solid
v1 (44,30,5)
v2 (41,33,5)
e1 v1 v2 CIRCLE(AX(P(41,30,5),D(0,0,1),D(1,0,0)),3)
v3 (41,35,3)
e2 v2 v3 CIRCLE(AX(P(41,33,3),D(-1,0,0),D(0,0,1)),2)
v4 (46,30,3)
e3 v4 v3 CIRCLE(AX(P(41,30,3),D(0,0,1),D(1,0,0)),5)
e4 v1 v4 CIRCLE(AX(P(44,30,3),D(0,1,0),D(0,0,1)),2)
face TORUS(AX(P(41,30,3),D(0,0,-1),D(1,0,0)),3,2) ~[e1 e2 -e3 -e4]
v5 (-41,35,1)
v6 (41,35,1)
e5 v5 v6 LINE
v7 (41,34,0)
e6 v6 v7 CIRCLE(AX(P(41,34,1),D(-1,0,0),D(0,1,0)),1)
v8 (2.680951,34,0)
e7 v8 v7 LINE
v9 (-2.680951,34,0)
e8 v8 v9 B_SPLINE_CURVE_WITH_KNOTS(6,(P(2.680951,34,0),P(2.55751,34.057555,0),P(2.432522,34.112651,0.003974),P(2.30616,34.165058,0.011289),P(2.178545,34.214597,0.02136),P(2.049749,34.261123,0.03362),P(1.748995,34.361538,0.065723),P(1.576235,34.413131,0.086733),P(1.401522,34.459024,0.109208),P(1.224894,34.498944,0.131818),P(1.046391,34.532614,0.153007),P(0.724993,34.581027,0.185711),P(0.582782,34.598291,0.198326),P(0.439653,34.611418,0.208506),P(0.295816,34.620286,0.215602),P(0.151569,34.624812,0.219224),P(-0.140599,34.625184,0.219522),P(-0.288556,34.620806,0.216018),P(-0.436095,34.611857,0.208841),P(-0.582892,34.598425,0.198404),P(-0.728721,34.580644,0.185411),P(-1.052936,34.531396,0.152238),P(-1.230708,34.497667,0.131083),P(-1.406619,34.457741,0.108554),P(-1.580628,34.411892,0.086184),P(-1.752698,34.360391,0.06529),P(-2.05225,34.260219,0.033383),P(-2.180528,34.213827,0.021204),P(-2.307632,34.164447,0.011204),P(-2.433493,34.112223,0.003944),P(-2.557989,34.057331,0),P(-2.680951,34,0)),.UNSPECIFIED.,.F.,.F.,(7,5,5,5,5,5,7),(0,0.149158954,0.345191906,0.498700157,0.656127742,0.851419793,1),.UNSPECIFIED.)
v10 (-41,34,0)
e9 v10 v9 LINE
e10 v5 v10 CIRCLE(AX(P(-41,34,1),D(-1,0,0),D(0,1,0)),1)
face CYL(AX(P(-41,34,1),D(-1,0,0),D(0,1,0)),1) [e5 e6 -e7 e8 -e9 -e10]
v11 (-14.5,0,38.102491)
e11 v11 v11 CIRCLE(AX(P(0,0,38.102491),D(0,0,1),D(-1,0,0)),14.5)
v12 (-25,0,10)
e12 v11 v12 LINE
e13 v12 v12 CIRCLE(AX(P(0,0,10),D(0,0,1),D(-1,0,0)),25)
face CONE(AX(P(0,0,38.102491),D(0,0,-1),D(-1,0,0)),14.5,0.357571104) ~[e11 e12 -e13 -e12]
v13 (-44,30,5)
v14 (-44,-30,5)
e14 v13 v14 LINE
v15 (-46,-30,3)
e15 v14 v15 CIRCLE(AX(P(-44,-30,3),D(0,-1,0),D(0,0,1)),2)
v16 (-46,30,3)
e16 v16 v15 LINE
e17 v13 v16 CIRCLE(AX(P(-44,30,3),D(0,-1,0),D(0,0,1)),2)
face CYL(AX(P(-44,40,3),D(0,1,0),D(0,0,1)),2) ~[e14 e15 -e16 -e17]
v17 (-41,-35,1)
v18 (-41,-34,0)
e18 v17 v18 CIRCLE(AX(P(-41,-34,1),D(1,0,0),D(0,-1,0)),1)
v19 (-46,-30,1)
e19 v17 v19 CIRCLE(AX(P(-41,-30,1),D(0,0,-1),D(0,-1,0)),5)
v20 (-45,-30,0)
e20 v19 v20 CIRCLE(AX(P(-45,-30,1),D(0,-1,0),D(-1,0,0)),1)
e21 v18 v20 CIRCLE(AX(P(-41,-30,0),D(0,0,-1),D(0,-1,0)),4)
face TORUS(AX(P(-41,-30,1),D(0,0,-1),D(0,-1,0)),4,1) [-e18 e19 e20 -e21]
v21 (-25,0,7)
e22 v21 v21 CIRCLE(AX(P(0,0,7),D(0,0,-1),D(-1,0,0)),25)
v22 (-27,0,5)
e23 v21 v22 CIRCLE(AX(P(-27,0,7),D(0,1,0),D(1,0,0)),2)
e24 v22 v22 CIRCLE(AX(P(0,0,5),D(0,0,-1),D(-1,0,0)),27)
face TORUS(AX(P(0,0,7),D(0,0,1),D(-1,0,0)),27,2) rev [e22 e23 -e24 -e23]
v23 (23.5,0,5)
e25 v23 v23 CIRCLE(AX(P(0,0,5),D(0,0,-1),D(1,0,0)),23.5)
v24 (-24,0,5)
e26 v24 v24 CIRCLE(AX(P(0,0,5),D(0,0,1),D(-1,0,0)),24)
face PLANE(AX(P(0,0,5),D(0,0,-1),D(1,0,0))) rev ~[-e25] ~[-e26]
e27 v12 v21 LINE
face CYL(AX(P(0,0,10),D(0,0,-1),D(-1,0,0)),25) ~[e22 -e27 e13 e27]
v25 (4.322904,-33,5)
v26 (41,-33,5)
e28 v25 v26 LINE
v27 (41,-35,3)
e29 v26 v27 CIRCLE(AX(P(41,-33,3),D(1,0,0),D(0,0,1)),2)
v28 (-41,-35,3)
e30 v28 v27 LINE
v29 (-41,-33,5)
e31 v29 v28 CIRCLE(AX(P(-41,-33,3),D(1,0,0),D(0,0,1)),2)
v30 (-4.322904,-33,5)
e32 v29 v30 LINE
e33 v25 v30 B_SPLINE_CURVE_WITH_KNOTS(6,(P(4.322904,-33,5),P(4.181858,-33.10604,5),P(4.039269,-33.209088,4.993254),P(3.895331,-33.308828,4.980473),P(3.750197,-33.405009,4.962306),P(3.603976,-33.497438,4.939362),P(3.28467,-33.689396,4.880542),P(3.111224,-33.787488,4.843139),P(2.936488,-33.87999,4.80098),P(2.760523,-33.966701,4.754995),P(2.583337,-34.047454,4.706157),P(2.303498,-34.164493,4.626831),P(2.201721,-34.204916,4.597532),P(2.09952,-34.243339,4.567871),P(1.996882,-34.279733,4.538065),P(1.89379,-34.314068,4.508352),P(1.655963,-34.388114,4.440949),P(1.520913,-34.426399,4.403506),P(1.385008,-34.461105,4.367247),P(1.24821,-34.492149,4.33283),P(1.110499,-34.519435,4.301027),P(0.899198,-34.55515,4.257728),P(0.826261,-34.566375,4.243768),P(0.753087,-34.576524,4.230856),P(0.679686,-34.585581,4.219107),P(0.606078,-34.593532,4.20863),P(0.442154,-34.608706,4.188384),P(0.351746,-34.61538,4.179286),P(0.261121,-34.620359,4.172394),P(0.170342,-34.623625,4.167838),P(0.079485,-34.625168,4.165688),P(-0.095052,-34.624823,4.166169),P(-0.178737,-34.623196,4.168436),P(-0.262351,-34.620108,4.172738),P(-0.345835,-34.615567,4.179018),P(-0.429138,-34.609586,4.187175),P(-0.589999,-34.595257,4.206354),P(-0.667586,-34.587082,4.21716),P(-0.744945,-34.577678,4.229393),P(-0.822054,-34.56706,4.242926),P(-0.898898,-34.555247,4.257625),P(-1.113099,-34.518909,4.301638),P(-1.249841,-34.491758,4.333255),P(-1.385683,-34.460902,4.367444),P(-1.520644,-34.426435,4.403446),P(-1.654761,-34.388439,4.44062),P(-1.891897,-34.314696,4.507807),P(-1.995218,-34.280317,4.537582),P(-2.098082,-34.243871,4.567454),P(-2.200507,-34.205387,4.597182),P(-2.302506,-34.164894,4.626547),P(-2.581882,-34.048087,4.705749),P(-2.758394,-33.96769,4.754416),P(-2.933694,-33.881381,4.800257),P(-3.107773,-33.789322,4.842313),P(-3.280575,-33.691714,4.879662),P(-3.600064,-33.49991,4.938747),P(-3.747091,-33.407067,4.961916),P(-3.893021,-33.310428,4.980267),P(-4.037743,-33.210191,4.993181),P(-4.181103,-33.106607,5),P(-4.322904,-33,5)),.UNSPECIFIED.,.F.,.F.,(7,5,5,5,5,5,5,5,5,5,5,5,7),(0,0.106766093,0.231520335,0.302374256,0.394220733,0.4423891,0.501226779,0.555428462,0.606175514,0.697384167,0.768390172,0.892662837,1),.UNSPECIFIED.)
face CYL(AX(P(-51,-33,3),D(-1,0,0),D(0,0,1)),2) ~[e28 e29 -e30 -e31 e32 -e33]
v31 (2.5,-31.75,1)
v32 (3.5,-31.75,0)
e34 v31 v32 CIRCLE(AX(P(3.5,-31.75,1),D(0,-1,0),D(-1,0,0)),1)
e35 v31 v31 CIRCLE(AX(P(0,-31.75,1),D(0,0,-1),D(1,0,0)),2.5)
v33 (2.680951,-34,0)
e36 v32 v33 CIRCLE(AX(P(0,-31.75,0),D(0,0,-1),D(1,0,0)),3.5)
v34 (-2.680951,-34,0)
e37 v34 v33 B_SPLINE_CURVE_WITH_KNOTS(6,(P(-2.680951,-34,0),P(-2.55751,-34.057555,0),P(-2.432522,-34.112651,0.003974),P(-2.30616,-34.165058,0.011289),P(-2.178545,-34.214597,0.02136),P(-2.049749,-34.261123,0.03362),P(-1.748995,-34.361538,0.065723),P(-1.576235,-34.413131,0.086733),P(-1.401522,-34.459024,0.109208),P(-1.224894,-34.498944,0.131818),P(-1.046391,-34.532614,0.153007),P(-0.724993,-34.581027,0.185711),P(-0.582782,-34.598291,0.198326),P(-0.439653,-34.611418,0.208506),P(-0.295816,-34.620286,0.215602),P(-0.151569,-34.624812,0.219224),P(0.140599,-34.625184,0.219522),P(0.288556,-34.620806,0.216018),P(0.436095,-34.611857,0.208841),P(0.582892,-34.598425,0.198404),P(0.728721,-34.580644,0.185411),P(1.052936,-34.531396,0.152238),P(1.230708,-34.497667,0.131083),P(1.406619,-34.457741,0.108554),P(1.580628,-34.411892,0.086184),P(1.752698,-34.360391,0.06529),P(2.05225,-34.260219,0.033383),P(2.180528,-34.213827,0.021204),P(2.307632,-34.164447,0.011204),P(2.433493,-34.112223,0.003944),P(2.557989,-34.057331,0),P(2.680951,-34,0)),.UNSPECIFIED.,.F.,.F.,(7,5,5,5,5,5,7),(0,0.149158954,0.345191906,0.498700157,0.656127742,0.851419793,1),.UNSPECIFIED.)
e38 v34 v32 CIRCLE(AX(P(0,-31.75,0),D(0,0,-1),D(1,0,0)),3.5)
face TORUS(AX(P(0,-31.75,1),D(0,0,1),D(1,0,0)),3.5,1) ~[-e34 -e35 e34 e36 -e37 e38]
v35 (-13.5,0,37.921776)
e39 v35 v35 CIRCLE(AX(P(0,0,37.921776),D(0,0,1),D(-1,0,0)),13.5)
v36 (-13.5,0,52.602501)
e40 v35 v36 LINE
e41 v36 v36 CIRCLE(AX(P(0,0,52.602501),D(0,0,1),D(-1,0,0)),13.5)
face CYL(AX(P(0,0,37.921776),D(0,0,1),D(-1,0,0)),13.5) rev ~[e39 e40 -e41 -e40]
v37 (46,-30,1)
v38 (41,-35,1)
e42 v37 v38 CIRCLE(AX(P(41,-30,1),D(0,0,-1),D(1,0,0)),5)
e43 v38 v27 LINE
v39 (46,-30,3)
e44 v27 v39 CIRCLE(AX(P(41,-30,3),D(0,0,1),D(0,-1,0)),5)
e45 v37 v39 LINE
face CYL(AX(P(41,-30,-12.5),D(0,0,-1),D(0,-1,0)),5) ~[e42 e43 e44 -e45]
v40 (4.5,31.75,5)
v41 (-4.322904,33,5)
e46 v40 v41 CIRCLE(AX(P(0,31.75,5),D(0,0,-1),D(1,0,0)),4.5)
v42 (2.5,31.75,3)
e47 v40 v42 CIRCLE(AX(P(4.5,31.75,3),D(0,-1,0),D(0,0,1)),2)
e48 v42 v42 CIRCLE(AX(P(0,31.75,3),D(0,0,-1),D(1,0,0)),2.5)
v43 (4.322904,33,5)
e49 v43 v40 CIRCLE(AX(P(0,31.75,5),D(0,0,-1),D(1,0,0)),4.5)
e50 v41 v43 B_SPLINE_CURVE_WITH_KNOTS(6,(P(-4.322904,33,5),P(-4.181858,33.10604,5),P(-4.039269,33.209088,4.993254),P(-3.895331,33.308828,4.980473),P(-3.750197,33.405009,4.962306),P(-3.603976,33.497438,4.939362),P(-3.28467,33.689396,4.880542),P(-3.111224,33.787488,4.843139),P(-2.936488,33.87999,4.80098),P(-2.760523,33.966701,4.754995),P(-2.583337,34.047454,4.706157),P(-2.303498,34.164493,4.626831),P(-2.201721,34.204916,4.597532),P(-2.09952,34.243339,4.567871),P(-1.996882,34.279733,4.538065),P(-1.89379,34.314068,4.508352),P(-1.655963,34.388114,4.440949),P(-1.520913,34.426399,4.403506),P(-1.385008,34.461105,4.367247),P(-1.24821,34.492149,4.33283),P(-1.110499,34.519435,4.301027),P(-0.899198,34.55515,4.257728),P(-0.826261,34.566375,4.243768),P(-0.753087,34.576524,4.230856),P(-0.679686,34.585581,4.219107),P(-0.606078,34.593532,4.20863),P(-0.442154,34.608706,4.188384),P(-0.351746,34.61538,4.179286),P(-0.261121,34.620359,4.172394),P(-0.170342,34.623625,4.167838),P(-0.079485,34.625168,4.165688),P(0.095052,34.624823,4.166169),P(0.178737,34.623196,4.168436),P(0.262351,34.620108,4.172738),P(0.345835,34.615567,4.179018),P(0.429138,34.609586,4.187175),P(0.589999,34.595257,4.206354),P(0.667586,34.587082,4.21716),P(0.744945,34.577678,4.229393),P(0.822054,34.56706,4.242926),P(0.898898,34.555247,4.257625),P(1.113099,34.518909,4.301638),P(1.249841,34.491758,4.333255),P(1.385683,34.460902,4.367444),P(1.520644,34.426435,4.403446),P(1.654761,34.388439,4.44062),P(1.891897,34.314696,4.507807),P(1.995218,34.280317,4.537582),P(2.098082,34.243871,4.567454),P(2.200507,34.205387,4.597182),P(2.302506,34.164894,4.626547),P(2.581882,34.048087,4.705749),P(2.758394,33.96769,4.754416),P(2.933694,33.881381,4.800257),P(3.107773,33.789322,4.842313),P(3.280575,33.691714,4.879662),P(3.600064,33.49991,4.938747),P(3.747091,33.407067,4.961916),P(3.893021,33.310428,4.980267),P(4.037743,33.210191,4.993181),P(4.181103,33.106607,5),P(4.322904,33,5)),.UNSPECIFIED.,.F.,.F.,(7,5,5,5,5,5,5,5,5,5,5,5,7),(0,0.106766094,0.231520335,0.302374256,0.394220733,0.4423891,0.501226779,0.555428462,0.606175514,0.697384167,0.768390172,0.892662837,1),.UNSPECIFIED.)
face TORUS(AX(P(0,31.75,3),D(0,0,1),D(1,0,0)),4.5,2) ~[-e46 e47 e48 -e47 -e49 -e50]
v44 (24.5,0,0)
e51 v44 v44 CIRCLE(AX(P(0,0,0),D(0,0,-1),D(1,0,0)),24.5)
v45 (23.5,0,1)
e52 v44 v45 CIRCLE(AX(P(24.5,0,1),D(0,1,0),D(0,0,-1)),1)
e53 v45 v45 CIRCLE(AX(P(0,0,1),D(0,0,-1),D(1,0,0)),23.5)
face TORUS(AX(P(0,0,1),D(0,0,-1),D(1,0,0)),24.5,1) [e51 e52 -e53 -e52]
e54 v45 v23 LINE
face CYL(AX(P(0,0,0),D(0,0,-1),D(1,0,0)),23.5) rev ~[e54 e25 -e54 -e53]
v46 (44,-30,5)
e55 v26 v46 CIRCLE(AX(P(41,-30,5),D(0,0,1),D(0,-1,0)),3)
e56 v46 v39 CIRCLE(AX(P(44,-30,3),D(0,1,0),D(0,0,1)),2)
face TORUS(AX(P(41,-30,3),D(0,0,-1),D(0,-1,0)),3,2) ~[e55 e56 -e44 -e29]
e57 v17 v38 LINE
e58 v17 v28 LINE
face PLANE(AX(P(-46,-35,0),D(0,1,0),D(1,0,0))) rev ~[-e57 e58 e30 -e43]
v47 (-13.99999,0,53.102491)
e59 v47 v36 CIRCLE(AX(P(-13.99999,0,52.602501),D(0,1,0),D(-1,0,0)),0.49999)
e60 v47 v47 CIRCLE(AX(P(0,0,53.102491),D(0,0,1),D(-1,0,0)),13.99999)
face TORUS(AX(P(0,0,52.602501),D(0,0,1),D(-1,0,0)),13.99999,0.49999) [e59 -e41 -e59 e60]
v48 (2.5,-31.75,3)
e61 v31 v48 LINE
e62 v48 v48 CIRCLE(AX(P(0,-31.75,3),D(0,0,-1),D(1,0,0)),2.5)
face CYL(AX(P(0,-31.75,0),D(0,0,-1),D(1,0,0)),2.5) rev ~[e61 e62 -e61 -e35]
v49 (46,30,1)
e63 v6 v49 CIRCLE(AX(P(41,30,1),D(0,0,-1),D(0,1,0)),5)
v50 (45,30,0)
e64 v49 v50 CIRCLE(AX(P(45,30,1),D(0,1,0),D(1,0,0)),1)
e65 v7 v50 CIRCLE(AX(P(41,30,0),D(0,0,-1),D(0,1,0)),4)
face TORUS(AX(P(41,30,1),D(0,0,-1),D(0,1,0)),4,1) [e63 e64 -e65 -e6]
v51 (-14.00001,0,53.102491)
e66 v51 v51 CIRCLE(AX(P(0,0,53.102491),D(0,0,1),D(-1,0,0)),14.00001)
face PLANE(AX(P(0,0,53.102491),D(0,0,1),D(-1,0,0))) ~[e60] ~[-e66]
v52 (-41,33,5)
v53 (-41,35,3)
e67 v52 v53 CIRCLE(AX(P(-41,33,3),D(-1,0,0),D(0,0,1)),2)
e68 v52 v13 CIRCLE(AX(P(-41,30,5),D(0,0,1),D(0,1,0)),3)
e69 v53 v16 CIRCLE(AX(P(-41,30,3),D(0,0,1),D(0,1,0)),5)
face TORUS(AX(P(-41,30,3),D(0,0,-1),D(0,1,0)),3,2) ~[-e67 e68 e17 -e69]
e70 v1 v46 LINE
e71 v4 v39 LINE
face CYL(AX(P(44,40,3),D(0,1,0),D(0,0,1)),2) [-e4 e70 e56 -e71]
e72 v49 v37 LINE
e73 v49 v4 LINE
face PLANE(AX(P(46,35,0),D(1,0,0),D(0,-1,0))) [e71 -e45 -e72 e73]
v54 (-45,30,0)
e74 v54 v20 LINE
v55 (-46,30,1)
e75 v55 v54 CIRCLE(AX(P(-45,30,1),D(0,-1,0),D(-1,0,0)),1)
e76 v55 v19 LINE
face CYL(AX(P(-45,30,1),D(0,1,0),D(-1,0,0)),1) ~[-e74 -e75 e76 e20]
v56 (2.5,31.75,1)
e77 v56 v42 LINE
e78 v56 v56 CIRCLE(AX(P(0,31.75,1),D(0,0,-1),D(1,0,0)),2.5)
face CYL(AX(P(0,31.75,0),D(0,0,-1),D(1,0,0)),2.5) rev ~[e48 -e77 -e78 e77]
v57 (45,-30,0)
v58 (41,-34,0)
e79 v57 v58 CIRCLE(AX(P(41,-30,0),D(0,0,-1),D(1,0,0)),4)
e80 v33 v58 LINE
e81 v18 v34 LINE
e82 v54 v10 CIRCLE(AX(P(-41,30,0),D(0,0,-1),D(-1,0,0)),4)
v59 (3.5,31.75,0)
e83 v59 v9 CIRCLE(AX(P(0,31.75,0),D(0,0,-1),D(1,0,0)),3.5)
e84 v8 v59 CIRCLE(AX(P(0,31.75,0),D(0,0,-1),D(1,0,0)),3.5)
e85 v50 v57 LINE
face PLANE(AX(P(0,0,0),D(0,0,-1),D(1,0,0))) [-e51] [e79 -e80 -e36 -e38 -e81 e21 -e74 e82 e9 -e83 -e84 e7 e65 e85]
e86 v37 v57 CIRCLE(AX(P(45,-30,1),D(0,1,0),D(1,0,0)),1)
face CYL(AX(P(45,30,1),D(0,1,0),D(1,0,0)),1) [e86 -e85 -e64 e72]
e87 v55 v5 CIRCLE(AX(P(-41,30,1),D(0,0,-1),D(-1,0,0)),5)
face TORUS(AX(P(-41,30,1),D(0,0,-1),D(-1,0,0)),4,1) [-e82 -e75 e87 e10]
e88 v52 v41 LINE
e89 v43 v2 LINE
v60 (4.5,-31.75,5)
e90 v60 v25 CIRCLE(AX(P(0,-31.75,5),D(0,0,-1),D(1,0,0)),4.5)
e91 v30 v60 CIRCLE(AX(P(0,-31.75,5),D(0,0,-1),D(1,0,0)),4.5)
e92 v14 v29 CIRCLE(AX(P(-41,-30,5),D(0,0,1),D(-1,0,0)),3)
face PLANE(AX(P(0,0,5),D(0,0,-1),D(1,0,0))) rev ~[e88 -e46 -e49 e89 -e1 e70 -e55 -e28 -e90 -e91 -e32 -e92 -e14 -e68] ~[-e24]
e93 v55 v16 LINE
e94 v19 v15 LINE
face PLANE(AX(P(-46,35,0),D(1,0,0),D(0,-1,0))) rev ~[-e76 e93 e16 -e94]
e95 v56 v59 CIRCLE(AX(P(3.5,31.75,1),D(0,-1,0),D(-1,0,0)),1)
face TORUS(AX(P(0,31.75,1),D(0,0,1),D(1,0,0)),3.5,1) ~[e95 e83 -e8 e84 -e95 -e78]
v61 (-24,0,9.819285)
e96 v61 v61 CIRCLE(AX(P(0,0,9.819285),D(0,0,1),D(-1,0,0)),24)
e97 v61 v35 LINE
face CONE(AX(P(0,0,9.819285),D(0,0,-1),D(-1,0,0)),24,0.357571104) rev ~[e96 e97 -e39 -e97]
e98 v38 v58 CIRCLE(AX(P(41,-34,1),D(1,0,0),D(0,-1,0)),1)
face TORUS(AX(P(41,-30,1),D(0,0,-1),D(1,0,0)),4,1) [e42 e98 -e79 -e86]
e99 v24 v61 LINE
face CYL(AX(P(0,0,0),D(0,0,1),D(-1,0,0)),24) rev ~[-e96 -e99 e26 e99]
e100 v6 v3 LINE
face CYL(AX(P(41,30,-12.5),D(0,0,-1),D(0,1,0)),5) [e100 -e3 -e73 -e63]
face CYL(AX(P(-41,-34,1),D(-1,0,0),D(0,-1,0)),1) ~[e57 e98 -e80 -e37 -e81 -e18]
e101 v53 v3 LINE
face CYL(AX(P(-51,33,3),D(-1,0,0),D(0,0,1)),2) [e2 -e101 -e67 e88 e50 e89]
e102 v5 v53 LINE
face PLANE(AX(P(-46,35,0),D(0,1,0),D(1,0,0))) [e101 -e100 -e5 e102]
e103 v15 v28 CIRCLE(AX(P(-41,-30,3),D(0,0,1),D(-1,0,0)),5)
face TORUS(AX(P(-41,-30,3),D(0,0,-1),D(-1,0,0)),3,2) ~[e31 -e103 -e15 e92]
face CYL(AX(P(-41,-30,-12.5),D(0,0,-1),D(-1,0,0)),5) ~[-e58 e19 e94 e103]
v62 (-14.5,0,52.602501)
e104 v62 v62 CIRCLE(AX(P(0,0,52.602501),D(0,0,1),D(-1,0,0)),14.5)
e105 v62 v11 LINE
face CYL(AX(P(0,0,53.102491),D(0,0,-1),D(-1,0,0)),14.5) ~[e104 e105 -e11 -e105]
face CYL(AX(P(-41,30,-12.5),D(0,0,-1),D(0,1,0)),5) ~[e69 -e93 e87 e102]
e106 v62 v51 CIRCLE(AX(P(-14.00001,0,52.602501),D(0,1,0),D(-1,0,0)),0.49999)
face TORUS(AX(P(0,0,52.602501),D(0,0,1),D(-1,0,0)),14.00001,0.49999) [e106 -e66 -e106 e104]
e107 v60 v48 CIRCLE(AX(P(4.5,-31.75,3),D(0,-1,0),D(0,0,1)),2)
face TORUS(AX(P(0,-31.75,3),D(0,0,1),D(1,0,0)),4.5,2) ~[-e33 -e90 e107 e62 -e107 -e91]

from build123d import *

# Parameters (mm, degrees)
F3_W          = 92
F3_H          = 70
F3_R          = 2.5
F4_DEPTH      = 5
F5_R          = 23.5
F6_DEPTH      = 5
F7_T3_DEPTH   = 102
F7_T5_DEPTH   = 80
F8_T1_DEPTH   = 17.4999999999
F8_T4_ANGLE   = 90
F8_T6_ANGLE   = 90
F8_T8_ANGLE   = 90
F8_T10_ANGLE  = 90
F9_R          = 0.49999
F10_T1_DEPTH  = 60
F10_T3_DEPTH  = 82
F10_T6_ANGLE  = 89.9999999974
F10_T8_ANGLE  = 89.9999999974
F10_T10_ANGLE = 89.9999999974
F10_T12_ANGLE = 89.9999999974


# Not quite as in the source:
# - a fillet or chamfer that OpenCascade refuses, or shapes differently, is made with other operations: its cross-section is extruded or revolved along the edge and cut away or added
# - a fillet or chamfer is up to 0.001 mm smaller than in the source, because OpenCascade refuses the exact size


with BuildPart() as f1:
    # F0 (on Front) → F1 (revolve)
    with BuildSketch(Plane.XZ):
        Polygon((-25, 10), (-25, 0), (-24, 0), (-24, 9.8192848565), (-13.5, 37.9217758492), (-13.5, 53.1024909928), (-14.5, 53.1024909928), (-14.5, 38.1024909928), align=None)
    revolve(axis=Axis((0, 0, 23.4480407089), (0, 0, 1)))

    # F3 (on offset) → F4 (join)
    with BuildSketch(Plane(origin=(0, 0, 0), x_dir=(1, 0, 0), z_dir=(0, 0, -1))):
        Rectangle(F3_W, F3_H)
        with Locations((0, -31.75)):
            Circle(F3_R, mode=Mode.SUBTRACT)
        with Locations((0, 31.75)):
            Circle(F3_R, mode=Mode.SUBTRACT)
    extrude(amount=-F4_DEPTH)

    # F5 (on face) → F6 (cut, through all)
    with BuildSketch(Plane(origin=(0, 0, 0), x_dir=(1, 0, 0), z_dir=(0, 0, -1))):
        Circle(F5_R)
    extrude(amount=-F6_DEPTH, mode=Mode.SUBTRACT)

    # F7: fillet of radius 2 on 7 edges, made by hand

    # F7_s1 → F7_t2 (revolve)
    with BuildSketch(Plane.XZ):
        with BuildLine():
            ThreePointArc((-25, 7), (-25.5857864376, 5.5857864376), (-27, 5))
            Line((-27, 5), (-25, 5))
            Line((-25, 5), (-25, 7))
        make_face()
    revolve(axis=Axis((0, 0, 5), (0, 0, -1)))

    # F7_s4 → F7_t3 (cut)
    with BuildSketch(Plane.YZ.offset(-51)):
        with BuildLine():
            ThreePointArc((-33, 5), (-34.4142135624, 4.4142135624), (-35, 3))
            Line((-35, 3), (-35, 5))
            Line((-35, 5), (-33, 5))
        make_face()
        with BuildLine():
            ThreePointArc((33, 5), (34.4142135624, 4.4142135624), (35, 3))
            Line((35, 3), (35, 5))
            Line((35, 5), (33, 5))
        make_face()
    extrude(amount=F7_T3_DEPTH, mode=Mode.SUBTRACT)

    # F7_s6 → F7_t5 (cut)
    with BuildSketch(Plane.XZ.offset(-40)):
        with BuildLine():
            ThreePointArc((44, 5), (45.4142135624, 4.4142135624), (46, 3))
            Line((46, 3), (46, 5))
            Line((46, 5), (44, 5))
        make_face()
        with BuildLine():
            ThreePointArc((-44, 5), (-45.4142135624, 4.4142135624), (-46, 3))
            Line((-46, 3), (-46, 5))
            Line((-46, 5), (-44, 5))
        make_face()
    extrude(amount=F7_T5_DEPTH, mode=Mode.SUBTRACT)

    # F7_s7 → F7_t8 (revolve, cut)
    with BuildSketch(Plane.XZ.offset(-31.75)):
        with BuildLine():
            ThreePointArc((4.5, 5), (3.0857864376, 4.4142135624), (2.5, 3))
            Line((2.5, 3), (2.5, 5))
            Line((2.5, 5), (4.5, 5))
        make_face()
    revolve(axis=Axis((0, 31.75, 5), (0, 0, -1)), mode=Mode.SUBTRACT)

    # F7_s9 → F7_t10 (revolve, cut)
    with BuildSketch(Plane.XZ.offset(31.75)):
        with BuildLine():
            ThreePointArc((4.5, 5), (3.0857864376, 4.4142135624), (2.5, 3))
            Line((2.5, 3), (2.5, 5))
            Line((2.5, 5), (4.5, 5))
        make_face()
    revolve(axis=Axis((0, -31.75, 5), (0, 0, -1)), mode=Mode.SUBTRACT)

    # F8: fillet of radius 5 on 4 edges, made by hand

    # F8_s2 → F8_t1 (cut)
    with BuildSketch(Plane.XY.offset(-12.5)):
        with BuildLine():
            ThreePointArc((41, -35), (44.5355339059, -33.5355339059), (46, -30))
            Line((46, -30), (46, -35))
            Line((46, -35), (41, -35))
        make_face()
        with BuildLine():
            ThreePointArc((-46, -30), (-44.5355339059, -33.5355339059), (-41, -35))
            Line((-41, -35), (-46, -35))
            Line((-46, -35), (-46, -30))
        make_face()
        with BuildLine():
            ThreePointArc((-41, 35), (-44.5355339059, 33.5355339059), (-46, 30))
            Line((-46, 30), (-46, 35))
            Line((-46, 35), (-41, 35))
        make_face()
        with BuildLine():
            ThreePointArc((41, 35), (44.5355339059, 33.5355339059), (46, 30))
            Line((46, 30), (46, 35))
            Line((46, 35), (41, 35))
        make_face()
    extrude(amount=F8_T1_DEPTH, mode=Mode.SUBTRACT)

    # F8_s3 → F8_t4 (revolve, cut)
    with BuildSketch(Plane.XZ.offset(-30)):
        with BuildLine():
            ThreePointArc((44.0000000001, 5), (45.4142135624, 4.4142135624), (46, 3.0000000001))
            Line((46, 3.0000000001), (46, 5))
            Line((46, 5), (44.0000000001, 5))
        make_face()
    revolve(axis=Axis((41, 30, 5), (0, 0, 1)), revolution_arc=F8_T4_ANGLE, mode=Mode.SUBTRACT)

    # F8_s5 → F8_t6 (revolve, cut)
    with BuildSketch(Plane.YZ.offset(-41)):
        with BuildLine():
            ThreePointArc((33.0000000001, 5), (34.4142135624, 4.4142135624), (35, 3.0000000001))
            Line((35, 3.0000000001), (35, 5))
            Line((35, 5), (33.0000000001, 5))
        make_face()
    revolve(axis=Axis((-41, 30, 5), (0, 0, 1)), revolution_arc=F8_T6_ANGLE, mode=Mode.SUBTRACT)

    # F8_s7 → F8_t8 (revolve, cut)
    with BuildSketch(Plane.XZ.offset(30)):
        with BuildLine():
            ThreePointArc((-44.0000000001, 5), (-45.4142135624, 4.4142135624), (-46, 3.0000000001))
            Line((-46, 3.0000000001), (-46, 5))
            Line((-46, 5), (-44.0000000001, 5))
        make_face()
    revolve(axis=Axis((-41, -30, 5), (0, 0, 1)), revolution_arc=F8_T8_ANGLE, mode=Mode.SUBTRACT)

    # F8_s9 → F8_t10 (revolve, cut)
    with BuildSketch(Plane.YZ.offset(41)):
        with BuildLine():
            ThreePointArc((-33.0000000001, 5), (-34.4142135624, 4.4142135624), (-35, 3.0000000001))
            Line((-35, 3.0000000001), (-35, 5))
            Line((-35, 5), (-33.0000000001, 5))
        make_face()
    revolve(axis=Axis((41, -30, 5), (0, 0, 1)), revolution_arc=F8_T10_ANGLE, mode=Mode.SUBTRACT)

    # F9 (radius 0.5 in the source; OpenCascade refuses exactly that, so slightly less here)
    f9_edges = [f1.edges().sort_by_distance(p)[0] for p in [
        (13.5, 0, 53.102491),
        (14.5, 0, 53.102491),
    ]]
    fillet(f9_edges, radius=F9_R)

    # F10: fillet of radius 1 on 11 edges, made by hand

    # F10_s2 → F10_t1 (cut)
    with BuildSketch(Plane.XZ.offset(-30)):
        with BuildLine():
            ThreePointArc((46, 1), (45.7071067812, 0.2928932188), (45, 0))
            Line((45, 0), (46, 0))
            Line((46, 0), (46, 1))
        make_face()
        with BuildLine():
            ThreePointArc((-46, 1), (-45.7071067812, 0.2928932188), (-45, 0))
            Line((-45, 0), (-46, 0))
            Line((-46, 0), (-46, 1))
        make_face()
    extrude(amount=F10_T1_DEPTH, mode=Mode.SUBTRACT)

    # F10_s4 → F10_t3 (cut)
    with BuildSketch(Plane.YZ.offset(-41)):
        with BuildLine():
            ThreePointArc((35, 1), (34.7071067812, 0.2928932188), (34, 0))
            Line((34, 0), (35, 0))
            Line((35, 0), (35, 1))
        make_face()
        with BuildLine():
            ThreePointArc((-35, 1), (-34.7071067812, 0.2928932188), (-34, 0))
            Line((-34, 0), (-35, 0))
            Line((-35, 0), (-35, 1))
        make_face()
    extrude(amount=F10_T3_DEPTH, mode=Mode.SUBTRACT)

    # F10_s5 → F10_t6 (revolve, cut)
    with BuildSketch(Plane.XZ.offset(29.9999999999)):
        with BuildLine():
            ThreePointArc((46, 1), (45.7071067812, 0.2928932188), (45, 0))
            Line((45, 0), (46, 0))
            Line((46, 0), (46, 1))
        make_face()
    revolve(axis=Axis((40.9999999999, -29.9999999999, 0), (0, 0, -1)), revolution_arc=F10_T6_ANGLE, mode=Mode.SUBTRACT)

    # F10_s7 → F10_t8 (revolve, cut)
    with BuildSketch(Plane.YZ.offset(40.9999999999)):
        with BuildLine():
            ThreePointArc((35, 1), (34.7071067812, 0.2928932188), (34, 0))
            Line((34, 0), (35, 0))
            Line((35, 0), (35, 1))
        make_face()
    revolve(axis=Axis((40.9999999999, 29.9999999999, 0), (0, 0, -1)), revolution_arc=F10_T8_ANGLE, mode=Mode.SUBTRACT)

    # F10_s9 → F10_t10 (revolve, cut)
    with BuildSketch(Plane.XZ.offset(-29.9999999999)):
        with BuildLine():
            ThreePointArc((-46, 1), (-45.7071067812, 0.2928932188), (-45, 0))
            Line((-45, 0), (-46, 0))
            Line((-46, 0), (-46, 1))
        make_face()
    revolve(axis=Axis((-40.9999999999, 29.9999999999, 0), (0, 0, -1)), revolution_arc=F10_T10_ANGLE, mode=Mode.SUBTRACT)

    # F10_s11 → F10_t12 (revolve, cut)
    with BuildSketch(Plane.YZ.offset(-40.9999999999)):
        with BuildLine():
            ThreePointArc((-35, 1), (-34.7071067812, 0.2928932188), (-34, 0))
            Line((-34, 0), (-35, 0))
            Line((-35, 0), (-35, 1))
        make_face()
    revolve(axis=Axis((-40.9999999999, -29.9999999999, 0), (0, 0, -1)), revolution_arc=F10_T12_ANGLE, mode=Mode.SUBTRACT)

    # F10_s13 → F10_t14 (revolve, cut)
    with BuildSketch(Plane.XZ.offset(-31.75)):
        with BuildLine():
            ThreePointArc((2.5, 1), (2.7928932188, 0.2928932188), (3.5, 0))
            Line((3.5, 0), (2.5, 0))
            Line((2.5, 0), (2.5, 1))
        make_face()
    revolve(axis=Axis((0, 31.75, 0), (0, 0, -1)), mode=Mode.SUBTRACT)

    # F10_s15 → F10_t16 (revolve, cut)
    with BuildSketch(Plane.XZ):
        with BuildLine():
            ThreePointArc((24.5, 0), (23.7928932188, 0.2928932188), (23.5, 1))
            Line((23.5, 1), (23.5, 0))
            Line((23.5, 0), (24.5, 0))
        make_face()
    revolve(axis=Axis((0, 0, 0), (0, 0, -1)), mode=Mode.SUBTRACT)

    # F10_s17 → F10_t18 (revolve, cut)
    with BuildSketch(Plane.XZ.offset(31.75)):
        with BuildLine():
            ThreePointArc((2.5, 1), (2.7928932188, 0.2928932188), (3.5, 0))
            Line((3.5, 0), (2.5, 0))
            Line((2.5, 0), (2.5, 1))
        make_face()
    revolve(axis=Axis((0, -31.75, 0), (0, 0, -1)), mode=Mode.SUBTRACT)


solid = f1.part
